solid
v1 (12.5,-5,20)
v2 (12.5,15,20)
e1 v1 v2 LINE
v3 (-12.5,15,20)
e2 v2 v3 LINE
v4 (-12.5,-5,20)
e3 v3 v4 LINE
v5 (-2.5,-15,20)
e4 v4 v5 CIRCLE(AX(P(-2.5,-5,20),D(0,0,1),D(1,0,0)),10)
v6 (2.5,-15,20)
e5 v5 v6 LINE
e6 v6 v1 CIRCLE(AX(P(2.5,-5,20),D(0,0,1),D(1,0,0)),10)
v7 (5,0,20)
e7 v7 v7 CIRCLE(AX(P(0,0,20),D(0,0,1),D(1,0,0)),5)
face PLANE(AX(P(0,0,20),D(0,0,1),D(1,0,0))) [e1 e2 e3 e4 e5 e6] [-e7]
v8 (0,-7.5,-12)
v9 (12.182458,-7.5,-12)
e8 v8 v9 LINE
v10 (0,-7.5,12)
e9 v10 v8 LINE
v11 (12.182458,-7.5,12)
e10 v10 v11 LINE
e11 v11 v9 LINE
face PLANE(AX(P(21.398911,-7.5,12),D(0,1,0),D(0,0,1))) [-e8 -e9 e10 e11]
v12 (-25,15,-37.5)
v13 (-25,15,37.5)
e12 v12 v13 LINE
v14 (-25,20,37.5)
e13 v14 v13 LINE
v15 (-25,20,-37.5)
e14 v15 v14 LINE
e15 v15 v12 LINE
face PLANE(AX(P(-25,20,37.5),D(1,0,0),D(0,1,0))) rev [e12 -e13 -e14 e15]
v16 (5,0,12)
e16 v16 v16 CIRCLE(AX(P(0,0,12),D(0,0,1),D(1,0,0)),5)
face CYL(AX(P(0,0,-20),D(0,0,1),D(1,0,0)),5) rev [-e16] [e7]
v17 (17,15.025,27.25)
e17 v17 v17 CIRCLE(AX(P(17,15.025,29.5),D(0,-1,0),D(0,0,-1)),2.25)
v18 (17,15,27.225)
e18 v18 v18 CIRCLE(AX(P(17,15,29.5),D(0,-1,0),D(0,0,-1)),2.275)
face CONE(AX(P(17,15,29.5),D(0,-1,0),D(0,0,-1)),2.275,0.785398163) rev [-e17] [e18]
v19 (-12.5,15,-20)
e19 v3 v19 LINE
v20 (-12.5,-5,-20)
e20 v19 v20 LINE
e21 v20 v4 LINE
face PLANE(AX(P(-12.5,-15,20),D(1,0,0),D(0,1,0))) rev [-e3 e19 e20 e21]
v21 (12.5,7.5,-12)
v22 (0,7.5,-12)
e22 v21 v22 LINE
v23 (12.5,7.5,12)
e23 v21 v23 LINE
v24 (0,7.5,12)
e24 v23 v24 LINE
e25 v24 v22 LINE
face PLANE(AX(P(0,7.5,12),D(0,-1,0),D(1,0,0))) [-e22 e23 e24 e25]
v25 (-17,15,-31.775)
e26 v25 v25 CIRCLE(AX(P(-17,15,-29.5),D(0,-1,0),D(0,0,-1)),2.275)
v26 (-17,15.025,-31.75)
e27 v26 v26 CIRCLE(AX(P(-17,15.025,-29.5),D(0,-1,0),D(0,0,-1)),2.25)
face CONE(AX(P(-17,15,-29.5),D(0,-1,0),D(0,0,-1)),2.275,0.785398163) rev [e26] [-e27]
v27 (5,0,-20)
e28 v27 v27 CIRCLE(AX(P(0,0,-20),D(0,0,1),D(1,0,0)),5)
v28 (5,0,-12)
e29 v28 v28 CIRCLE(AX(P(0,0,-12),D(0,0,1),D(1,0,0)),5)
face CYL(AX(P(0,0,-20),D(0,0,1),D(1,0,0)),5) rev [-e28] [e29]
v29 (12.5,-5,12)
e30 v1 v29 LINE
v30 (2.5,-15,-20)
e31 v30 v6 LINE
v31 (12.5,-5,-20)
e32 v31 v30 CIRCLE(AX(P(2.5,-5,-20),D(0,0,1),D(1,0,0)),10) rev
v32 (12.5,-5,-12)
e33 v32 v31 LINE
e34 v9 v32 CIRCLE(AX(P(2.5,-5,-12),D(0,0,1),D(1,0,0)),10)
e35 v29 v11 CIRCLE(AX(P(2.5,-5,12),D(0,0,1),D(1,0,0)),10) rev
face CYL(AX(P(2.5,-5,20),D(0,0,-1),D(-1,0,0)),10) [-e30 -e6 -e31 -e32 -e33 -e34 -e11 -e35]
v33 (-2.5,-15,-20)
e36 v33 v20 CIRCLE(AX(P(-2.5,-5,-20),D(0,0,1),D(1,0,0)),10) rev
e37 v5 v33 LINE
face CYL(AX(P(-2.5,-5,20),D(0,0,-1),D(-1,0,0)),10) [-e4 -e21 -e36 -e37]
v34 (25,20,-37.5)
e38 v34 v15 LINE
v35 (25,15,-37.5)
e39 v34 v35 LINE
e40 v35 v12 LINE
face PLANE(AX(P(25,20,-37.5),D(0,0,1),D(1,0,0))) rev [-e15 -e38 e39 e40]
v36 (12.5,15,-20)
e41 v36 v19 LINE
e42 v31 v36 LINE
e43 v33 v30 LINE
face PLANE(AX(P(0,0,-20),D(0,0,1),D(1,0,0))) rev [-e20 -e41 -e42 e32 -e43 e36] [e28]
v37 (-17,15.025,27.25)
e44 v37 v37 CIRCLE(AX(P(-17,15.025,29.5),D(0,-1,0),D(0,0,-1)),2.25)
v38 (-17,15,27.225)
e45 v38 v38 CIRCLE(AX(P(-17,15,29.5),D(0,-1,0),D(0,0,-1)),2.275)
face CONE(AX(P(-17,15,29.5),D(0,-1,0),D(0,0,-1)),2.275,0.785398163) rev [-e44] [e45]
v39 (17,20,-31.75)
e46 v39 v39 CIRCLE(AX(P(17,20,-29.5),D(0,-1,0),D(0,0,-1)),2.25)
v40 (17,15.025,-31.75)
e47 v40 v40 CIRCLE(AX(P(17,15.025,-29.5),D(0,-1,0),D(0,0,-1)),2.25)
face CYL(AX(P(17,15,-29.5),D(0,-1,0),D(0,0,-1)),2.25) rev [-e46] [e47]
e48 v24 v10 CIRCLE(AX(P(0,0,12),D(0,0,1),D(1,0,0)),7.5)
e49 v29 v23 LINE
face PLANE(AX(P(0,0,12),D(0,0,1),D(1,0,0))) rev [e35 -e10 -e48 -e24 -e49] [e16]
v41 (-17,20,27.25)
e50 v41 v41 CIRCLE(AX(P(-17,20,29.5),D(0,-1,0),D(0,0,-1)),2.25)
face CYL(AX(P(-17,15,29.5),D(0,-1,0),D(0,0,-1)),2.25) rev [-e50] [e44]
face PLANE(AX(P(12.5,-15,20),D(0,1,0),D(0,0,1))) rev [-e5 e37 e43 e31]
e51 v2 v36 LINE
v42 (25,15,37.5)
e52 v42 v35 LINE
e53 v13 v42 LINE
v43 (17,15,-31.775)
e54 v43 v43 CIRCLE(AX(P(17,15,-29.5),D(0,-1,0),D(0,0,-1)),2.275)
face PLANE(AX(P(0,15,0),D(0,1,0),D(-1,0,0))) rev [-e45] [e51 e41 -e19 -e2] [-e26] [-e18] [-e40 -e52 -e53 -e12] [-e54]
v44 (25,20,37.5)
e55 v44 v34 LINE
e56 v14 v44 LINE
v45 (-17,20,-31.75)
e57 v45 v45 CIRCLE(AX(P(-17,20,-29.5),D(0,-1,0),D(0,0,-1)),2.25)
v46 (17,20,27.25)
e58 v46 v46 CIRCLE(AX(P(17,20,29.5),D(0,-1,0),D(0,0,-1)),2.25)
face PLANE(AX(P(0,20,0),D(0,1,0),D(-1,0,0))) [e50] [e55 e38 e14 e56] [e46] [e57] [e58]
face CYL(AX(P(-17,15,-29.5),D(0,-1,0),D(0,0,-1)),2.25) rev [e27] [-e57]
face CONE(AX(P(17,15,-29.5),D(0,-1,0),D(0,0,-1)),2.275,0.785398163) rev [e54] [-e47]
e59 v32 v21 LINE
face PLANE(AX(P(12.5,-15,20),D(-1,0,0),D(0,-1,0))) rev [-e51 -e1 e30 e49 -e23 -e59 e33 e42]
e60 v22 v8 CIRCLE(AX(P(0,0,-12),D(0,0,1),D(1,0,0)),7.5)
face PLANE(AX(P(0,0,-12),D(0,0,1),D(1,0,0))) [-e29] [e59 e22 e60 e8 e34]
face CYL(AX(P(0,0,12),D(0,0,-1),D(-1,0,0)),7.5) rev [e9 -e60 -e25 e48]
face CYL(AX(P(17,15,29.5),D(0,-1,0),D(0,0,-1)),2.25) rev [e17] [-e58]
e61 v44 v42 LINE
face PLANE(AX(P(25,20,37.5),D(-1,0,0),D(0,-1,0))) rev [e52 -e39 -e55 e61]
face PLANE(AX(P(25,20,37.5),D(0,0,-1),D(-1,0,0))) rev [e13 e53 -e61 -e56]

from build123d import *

# Parameters (mm, degrees)
SKETCH1_W                      = 25
SKETCH1_H                      = 30
BOSS_EXTRUDE1_DEPTH            = 20
CUT_EXTRUDE1_DEPTH             = 12
CUT_EXTRUDE1_DEPTH_BACK        = 12
SKETCH3_R                      = 5
CUT_EXTRUDE2_DEPTH             = 45.511234537
SKETCH4_W                      = 50
SKETCH4_H                      = 75
BOSS_EXTRUDE2_DEPTH            = 5
FILLET1_R                      = 10
M4_CLEARANCE_HOLE1_D           = 4.5
M4_CLEARANCE_HOLE1_CSINK_D     = 4.55
M4_CLEARANCE_HOLE1_CSINK_ANGLE = 90


with BuildPart() as part:
    # Sketch1 → Boss-Extrude1 (new, symmetric)
    with BuildSketch(Plane.XY):
        Rectangle(SKETCH1_W, SKETCH1_H)
    extrude(amount=BOSS_EXTRUDE1_DEPTH, both=True)

    # Sketch2 → Cut-Extrude1 (cut, two sides: drawn at the far end of the back side and taken through both)
    with BuildSketch(Plane.XY.offset(-CUT_EXTRUDE1_DEPTH_BACK)):
        with BuildLine():
            Line((0, 7.5), (21.39891064, 7.5))
            Line((21.39891064, 7.5), (21.39891064, -7.5))
            Line((21.39891064, -7.5), (0, -7.5))
            ThreePointArc((0, -7.5), (-7.5, 0), (0, 7.5))
        make_face()
    extrude(amount=CUT_EXTRUDE1_DEPTH + CUT_EXTRUDE1_DEPTH_BACK, mode=Mode.SUBTRACT)

    # Sketch3 → Cut-Extrude2 (cut, through all)
    with BuildSketch(Plane.XY.offset(20)):
        Circle(SKETCH3_R)
    extrude(amount=-CUT_EXTRUDE2_DEPTH, mode=Mode.SUBTRACT)

    # Sketch4 → Boss-Extrude2 (add)
    with BuildSketch(Plane(origin=(0, 15, 0), x_dir=(1, 0, 0), z_dir=(0, 1, 0))):
        Rectangle(SKETCH4_W, SKETCH4_H)
    extrude(amount=BOSS_EXTRUDE2_DEPTH)

    # Fillet1
    # the kernel refuses this fillet: 10 mm, written as the material it takes off along each edge
    with BuildSketch(Plane(origin=(-12.5, -15, 45), x_dir=(0, 1, 0), z_dir=(0, 0, -1)), Plane(origin=(12.5, -15, -45), x_dir=(0, 1, 0), z_dir=(0, 0, 1))) as fillet1_piece_1:
        with BuildLine():
            CenterArc((FILLET1_R, FILLET1_R), FILLET1_R, 180, 90)
            Line((0, FILLET1_R), (0, 0))
            Line((0, 0), (FILLET1_R, 0))
        make_face()
    extrude(amount=90, mode=Mode.SUBTRACT)

    # M4 Clearance Hole1 (through all)
    with Locations(Plane(origin=(0, 15, 0), x_dir=(-1, 0, 0), z_dir=(0, -1, 0))):
        with Locations((-17, 29.5), (17, 29.5), (17, -29.5), (-17, -29.5)):
            CounterSinkHole(M4_CLEARANCE_HOLE1_D / 2, M4_CLEARANCE_HOLE1_CSINK_D / 2, counter_sink_angle=M4_CLEARANCE_HOLE1_CSINK_ANGLE)


solid = part.part
